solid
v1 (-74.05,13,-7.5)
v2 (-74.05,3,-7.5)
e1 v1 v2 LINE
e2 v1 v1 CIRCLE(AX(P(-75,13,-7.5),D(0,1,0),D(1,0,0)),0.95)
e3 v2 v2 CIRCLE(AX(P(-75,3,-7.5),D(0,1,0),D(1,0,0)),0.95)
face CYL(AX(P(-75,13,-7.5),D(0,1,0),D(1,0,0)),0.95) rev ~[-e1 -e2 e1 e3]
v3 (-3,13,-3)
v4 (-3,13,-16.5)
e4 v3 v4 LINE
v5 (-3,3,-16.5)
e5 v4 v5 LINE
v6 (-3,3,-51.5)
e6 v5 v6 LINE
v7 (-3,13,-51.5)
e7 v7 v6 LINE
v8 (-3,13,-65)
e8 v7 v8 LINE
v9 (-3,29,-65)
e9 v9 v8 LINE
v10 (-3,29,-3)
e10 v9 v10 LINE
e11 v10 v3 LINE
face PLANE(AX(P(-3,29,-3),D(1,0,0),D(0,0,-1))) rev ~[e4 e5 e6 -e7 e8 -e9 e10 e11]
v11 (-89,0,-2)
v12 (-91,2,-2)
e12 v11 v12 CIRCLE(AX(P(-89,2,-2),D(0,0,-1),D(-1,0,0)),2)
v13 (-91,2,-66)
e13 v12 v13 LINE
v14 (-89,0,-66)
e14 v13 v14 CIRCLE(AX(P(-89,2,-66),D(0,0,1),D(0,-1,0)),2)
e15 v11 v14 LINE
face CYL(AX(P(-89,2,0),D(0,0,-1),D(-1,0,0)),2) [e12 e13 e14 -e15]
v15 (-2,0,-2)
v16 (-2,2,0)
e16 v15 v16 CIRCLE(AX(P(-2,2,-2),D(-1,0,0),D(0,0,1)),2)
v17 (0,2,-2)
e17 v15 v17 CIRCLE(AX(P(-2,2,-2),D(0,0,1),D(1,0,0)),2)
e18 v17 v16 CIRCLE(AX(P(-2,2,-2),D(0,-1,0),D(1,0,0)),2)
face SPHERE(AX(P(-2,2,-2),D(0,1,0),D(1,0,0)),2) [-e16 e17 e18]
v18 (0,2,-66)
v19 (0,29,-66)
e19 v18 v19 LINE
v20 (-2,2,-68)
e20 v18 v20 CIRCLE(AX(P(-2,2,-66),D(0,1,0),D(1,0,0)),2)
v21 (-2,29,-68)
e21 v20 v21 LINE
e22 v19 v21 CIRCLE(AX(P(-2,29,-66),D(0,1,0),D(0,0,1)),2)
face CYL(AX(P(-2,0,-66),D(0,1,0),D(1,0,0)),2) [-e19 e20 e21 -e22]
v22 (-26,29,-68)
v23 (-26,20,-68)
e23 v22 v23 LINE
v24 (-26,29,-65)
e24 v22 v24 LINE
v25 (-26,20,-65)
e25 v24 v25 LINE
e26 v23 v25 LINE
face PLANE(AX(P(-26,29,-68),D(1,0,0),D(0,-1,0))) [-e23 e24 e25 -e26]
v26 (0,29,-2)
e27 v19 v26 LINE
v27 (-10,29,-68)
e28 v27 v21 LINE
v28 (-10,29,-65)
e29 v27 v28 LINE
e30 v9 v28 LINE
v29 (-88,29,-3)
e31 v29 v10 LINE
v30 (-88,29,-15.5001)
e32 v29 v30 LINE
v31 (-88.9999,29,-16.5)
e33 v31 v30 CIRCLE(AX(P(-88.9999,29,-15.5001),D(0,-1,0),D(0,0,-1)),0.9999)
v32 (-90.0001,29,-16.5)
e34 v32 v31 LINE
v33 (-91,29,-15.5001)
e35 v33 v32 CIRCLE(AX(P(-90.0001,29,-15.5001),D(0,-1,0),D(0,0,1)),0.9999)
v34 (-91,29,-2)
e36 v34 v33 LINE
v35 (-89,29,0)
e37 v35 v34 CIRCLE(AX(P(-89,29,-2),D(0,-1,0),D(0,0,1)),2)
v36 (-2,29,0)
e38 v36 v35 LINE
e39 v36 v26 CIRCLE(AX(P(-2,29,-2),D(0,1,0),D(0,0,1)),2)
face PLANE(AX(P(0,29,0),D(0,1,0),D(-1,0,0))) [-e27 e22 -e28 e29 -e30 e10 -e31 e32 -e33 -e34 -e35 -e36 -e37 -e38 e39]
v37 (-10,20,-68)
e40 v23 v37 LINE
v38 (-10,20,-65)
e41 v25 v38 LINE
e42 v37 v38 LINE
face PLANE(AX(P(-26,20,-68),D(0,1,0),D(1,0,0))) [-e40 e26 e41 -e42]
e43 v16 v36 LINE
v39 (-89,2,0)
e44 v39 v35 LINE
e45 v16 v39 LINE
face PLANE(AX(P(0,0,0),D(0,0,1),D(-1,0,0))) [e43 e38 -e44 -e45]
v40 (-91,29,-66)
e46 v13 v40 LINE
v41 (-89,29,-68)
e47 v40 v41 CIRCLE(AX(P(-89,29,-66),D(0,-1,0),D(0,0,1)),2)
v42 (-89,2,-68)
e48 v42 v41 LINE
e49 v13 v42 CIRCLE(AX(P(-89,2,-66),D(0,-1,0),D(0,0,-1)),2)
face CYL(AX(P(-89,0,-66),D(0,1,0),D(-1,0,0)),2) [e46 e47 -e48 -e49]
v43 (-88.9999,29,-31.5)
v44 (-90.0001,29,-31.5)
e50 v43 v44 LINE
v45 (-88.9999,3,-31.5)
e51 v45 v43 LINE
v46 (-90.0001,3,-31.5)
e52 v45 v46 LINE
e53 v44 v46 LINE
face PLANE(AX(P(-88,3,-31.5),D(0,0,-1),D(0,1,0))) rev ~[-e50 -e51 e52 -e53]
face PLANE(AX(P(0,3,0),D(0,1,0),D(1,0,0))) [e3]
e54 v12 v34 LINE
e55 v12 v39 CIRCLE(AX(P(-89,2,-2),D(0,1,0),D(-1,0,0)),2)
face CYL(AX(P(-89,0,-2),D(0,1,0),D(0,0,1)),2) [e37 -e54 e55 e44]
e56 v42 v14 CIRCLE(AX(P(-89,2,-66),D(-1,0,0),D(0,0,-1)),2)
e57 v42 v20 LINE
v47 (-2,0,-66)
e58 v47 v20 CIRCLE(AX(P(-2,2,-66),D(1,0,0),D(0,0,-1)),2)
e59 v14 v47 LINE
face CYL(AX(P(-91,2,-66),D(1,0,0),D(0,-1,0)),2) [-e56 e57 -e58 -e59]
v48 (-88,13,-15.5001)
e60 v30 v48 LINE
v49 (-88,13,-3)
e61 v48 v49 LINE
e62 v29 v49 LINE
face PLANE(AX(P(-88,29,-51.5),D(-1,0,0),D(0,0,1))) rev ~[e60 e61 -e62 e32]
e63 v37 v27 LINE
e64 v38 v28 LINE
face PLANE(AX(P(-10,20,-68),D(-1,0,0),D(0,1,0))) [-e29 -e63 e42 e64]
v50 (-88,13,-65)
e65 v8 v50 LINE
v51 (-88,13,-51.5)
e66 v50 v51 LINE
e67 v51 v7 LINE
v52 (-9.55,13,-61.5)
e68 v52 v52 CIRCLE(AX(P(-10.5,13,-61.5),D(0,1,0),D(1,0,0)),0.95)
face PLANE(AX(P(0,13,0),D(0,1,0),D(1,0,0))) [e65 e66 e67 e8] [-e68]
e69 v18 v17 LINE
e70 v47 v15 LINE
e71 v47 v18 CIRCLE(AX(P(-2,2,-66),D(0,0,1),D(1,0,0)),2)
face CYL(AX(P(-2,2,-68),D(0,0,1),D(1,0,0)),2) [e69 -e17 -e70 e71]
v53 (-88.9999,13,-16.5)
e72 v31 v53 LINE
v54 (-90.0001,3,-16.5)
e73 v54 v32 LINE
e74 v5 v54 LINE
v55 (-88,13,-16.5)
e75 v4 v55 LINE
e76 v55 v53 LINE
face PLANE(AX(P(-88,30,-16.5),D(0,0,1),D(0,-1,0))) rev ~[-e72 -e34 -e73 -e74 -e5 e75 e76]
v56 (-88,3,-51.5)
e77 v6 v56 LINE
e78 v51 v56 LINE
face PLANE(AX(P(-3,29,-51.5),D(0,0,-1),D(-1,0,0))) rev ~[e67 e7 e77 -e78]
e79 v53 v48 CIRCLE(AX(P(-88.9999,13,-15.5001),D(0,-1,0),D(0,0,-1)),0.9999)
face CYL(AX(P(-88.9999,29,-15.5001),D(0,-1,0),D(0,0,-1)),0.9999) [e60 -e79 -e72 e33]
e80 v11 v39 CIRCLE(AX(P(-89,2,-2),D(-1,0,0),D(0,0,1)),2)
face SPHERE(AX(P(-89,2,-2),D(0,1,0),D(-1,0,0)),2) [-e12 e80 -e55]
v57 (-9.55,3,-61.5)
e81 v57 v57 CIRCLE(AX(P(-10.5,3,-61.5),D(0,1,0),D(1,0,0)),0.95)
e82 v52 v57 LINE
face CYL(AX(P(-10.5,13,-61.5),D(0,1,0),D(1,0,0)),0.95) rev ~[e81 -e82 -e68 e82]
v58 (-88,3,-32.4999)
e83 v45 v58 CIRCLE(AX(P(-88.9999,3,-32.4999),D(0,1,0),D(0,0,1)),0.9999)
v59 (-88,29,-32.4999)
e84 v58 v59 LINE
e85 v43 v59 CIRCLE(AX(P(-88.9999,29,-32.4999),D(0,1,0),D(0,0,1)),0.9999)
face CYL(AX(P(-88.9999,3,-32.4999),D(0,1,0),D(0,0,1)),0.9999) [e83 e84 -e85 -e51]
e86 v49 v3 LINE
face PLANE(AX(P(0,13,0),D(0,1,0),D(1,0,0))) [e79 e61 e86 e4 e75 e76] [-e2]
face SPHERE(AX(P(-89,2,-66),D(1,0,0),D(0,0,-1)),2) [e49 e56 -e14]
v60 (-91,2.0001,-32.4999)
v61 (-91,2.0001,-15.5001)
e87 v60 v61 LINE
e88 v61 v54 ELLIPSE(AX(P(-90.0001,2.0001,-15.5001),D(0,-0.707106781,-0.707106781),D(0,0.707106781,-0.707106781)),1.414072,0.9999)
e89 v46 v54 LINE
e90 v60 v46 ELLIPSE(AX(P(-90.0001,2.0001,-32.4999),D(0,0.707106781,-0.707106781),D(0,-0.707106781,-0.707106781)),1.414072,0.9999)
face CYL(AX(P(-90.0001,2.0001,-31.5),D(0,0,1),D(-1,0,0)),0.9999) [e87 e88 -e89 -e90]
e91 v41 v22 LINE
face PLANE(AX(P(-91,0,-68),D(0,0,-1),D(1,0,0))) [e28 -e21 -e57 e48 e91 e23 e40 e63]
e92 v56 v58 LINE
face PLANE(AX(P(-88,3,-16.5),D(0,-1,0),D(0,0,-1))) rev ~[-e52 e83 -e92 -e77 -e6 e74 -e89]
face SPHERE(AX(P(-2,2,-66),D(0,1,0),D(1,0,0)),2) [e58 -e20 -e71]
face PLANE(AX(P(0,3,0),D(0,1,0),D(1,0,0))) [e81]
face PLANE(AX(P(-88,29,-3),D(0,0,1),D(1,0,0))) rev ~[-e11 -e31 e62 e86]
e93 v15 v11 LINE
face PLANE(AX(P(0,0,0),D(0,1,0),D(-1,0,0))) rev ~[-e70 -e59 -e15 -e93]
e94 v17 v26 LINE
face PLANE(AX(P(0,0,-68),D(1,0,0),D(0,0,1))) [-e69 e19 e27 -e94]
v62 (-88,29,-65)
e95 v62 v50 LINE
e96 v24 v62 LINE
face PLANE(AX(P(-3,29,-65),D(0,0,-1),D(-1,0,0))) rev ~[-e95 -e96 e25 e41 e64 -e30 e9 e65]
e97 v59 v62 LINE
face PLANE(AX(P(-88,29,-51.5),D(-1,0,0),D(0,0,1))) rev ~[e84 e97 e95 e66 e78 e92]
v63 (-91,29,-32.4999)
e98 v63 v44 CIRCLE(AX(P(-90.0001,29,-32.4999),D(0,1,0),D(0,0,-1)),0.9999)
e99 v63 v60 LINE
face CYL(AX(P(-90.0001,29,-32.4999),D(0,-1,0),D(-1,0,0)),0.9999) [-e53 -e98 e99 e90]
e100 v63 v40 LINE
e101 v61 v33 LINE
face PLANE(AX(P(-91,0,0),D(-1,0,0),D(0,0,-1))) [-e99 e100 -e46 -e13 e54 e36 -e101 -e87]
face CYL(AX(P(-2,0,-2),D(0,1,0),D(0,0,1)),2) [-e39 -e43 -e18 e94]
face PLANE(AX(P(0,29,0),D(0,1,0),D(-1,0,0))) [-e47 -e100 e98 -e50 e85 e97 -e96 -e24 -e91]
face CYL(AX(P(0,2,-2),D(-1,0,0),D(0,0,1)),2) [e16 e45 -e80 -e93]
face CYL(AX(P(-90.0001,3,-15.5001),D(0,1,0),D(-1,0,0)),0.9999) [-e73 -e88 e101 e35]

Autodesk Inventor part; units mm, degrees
ref_plane "YZ Plane" through (0, 0, 0) normal (1, 0, 0) x (0, 1, 0)
ref_plane "XZ Plane" through (0, 0, 0) normal (0, 1, 0) x (-1, 0, 0)
ref_plane "XY Plane" through (0, 0, 0) normal (0, 0, 1) x (1, 0, 0)
sketch "Sketch1" plane through (0, 0, 0) normal (0, 1, 0) x (-1, 0, 0)
  line L0 (0, 0) -> (91, 0)
  line L1 (91, 0) -> (91, -68)
  line L2 (91, -68) -> (0, -68)
  line L3 (0, -68) -> (0, 0)
  line L4 (88, -3) -> (3, -3)
  line L5 (3, -3) -> (3, -65)
  line L6 (3, -65) -> (88, -65)
  line L7 (88, -65) -> (88, -3)
  dimension "d0" = 91
  dimension "d1" = 68
  dimension "d2" = 62
  dimension "d3" = 85
  dimension "d4" = 3
  dimension "d5" = 3
extrude "Extrusion1" add sketch "Sketch1" along normal blind 29 contours L0 L1 L2 L3 | L7 L6 L5 L4
sketch "Sketch2" plane through (0, 29, 0) normal (0, 1, 0) x (1, 0, 0)
  line L0 (-88, 16.5) -> (-3, 16.5)
  line L1 (-3, 16.5) -> (-3, 51.5)
  line L2 (-3, 51.5) -> (-88, 51.5)
  line L3 (-88, 51.5) -> (-88, 16.5)
  line L4 (-91, 68) -> (-91, 0) projected
  line L5 (0, 68) -> (-91, 68) projected
  point P0 (0, 0)
  dimension "d8" = 85
  dimension "d9" = 35
  dimension "d10" = 3
  dimension "d11" = 16.5
extrude "Extrusion2" cut sketch "Sketch2" against normal blind 26
sketch "Sketch3" plane through (0, 29, 0) normal (0, 1, 0) x (1, 0, 0)
  line L0 (-88, 3) -> (-3, 3)
  line L1 (-3, 3) -> (-3, 65)
  line L2 (-3, 65) -> (-88, 65)
  line L3 (-88, 65) -> (-88, 3)
  line L4 (-91, 68) -> (-91, 0) projected
  line L5 (0, 68) -> (-91, 68) projected
  point P0 (0, 0)
  point P1 (-45.5, 68)
  dimension "d14" = 62
  dimension "d15" = 85
  dimension "d16" = 3
  dimension "d17" = 3
extrude "Extrusion3" cut sketch "Sketch3" against normal blind 16
sketch "Sketch4" plane through (0, 0, -68) normal (0, 0, -1) x (-1, 0, 0)
  line L0 (88, 29) -> (3, 29) projected
  line L1 (10, 29) -> (26, 29)
  line L2 (26, 29) -> (26, 20)
  line L3 (26, 20) -> (10, 20)
  line L4 (10, 20) -> (10, 29)
  line L5 (0, 0) -> (0, 29) projected
  point P0 (26, 29)
  dimension "d20" = 16
  dimension "d21" = 9
  dimension "d22" = 10
extrude "Extrusion4" cut sketch "Sketch4" against normal blind 4
sketch "Sketch5" plane through (0, 13, 0) normal (0, 1, 0) x (1, 0, 0)
  circle A0 centre (-75, 7.5) radius 0.95
  line L0 (-88, 3) -> (-88, 65) projected
  line L1 (-3, 3) -> (-88, 3) projected
  circle A1 centre (-10.5, 61.5) radius 0.95
  line L2 (-88, 65) -> (-26, 65) projected
  line L3 (-3, 65) -> (-3, 3) projected
  point P0 (0, 0)
  dimension "d25" = 1.9
  dimension "d26" = 13
  dimension "d27" = 4.5
  dimension "d28" = 1.9
  dimension "d29" = 3.5
  dimension "d30" = 7.5
extrude "Extrusion5" cut sketch "Sketch5" against normal blind 10
fillet "Fillet1" radius 2 8 edges at (0, 14.5, -68) (0, 14.5, 0) (0, 0, -34) (-45.5, 0, -68) (-91, 14.5, -68) (-91, 14.5, 0) (-91, 0, -34) (-45.5, 0, 0)
sketch "Sketch6" plane through (-88, 3, -16.5) normal (1, 0, 0) x (0, 0, -1)
  line L0 (0, 0) -> (15, 0)
  line L1 (15, 0) -> (15, 27)
  line L2 (15, 27) -> (0, 27)
  line L3 (0, 27) -> (0, 0)
  point P0 (-16.5, -3)
  dimension "d34" = 15
  dimension "d35" = 27
extrude "Extrusion6" cut sketch "Sketch6" against normal blind 10
fillet "Fillet2" radius 1 5 edges at (-88, 16, -31.5) (-91, 16, -31.5) (-91, 16, -16.5) (-88, 21, -16.5) (-91, 3, -24)
properties part number "Glove Case"
